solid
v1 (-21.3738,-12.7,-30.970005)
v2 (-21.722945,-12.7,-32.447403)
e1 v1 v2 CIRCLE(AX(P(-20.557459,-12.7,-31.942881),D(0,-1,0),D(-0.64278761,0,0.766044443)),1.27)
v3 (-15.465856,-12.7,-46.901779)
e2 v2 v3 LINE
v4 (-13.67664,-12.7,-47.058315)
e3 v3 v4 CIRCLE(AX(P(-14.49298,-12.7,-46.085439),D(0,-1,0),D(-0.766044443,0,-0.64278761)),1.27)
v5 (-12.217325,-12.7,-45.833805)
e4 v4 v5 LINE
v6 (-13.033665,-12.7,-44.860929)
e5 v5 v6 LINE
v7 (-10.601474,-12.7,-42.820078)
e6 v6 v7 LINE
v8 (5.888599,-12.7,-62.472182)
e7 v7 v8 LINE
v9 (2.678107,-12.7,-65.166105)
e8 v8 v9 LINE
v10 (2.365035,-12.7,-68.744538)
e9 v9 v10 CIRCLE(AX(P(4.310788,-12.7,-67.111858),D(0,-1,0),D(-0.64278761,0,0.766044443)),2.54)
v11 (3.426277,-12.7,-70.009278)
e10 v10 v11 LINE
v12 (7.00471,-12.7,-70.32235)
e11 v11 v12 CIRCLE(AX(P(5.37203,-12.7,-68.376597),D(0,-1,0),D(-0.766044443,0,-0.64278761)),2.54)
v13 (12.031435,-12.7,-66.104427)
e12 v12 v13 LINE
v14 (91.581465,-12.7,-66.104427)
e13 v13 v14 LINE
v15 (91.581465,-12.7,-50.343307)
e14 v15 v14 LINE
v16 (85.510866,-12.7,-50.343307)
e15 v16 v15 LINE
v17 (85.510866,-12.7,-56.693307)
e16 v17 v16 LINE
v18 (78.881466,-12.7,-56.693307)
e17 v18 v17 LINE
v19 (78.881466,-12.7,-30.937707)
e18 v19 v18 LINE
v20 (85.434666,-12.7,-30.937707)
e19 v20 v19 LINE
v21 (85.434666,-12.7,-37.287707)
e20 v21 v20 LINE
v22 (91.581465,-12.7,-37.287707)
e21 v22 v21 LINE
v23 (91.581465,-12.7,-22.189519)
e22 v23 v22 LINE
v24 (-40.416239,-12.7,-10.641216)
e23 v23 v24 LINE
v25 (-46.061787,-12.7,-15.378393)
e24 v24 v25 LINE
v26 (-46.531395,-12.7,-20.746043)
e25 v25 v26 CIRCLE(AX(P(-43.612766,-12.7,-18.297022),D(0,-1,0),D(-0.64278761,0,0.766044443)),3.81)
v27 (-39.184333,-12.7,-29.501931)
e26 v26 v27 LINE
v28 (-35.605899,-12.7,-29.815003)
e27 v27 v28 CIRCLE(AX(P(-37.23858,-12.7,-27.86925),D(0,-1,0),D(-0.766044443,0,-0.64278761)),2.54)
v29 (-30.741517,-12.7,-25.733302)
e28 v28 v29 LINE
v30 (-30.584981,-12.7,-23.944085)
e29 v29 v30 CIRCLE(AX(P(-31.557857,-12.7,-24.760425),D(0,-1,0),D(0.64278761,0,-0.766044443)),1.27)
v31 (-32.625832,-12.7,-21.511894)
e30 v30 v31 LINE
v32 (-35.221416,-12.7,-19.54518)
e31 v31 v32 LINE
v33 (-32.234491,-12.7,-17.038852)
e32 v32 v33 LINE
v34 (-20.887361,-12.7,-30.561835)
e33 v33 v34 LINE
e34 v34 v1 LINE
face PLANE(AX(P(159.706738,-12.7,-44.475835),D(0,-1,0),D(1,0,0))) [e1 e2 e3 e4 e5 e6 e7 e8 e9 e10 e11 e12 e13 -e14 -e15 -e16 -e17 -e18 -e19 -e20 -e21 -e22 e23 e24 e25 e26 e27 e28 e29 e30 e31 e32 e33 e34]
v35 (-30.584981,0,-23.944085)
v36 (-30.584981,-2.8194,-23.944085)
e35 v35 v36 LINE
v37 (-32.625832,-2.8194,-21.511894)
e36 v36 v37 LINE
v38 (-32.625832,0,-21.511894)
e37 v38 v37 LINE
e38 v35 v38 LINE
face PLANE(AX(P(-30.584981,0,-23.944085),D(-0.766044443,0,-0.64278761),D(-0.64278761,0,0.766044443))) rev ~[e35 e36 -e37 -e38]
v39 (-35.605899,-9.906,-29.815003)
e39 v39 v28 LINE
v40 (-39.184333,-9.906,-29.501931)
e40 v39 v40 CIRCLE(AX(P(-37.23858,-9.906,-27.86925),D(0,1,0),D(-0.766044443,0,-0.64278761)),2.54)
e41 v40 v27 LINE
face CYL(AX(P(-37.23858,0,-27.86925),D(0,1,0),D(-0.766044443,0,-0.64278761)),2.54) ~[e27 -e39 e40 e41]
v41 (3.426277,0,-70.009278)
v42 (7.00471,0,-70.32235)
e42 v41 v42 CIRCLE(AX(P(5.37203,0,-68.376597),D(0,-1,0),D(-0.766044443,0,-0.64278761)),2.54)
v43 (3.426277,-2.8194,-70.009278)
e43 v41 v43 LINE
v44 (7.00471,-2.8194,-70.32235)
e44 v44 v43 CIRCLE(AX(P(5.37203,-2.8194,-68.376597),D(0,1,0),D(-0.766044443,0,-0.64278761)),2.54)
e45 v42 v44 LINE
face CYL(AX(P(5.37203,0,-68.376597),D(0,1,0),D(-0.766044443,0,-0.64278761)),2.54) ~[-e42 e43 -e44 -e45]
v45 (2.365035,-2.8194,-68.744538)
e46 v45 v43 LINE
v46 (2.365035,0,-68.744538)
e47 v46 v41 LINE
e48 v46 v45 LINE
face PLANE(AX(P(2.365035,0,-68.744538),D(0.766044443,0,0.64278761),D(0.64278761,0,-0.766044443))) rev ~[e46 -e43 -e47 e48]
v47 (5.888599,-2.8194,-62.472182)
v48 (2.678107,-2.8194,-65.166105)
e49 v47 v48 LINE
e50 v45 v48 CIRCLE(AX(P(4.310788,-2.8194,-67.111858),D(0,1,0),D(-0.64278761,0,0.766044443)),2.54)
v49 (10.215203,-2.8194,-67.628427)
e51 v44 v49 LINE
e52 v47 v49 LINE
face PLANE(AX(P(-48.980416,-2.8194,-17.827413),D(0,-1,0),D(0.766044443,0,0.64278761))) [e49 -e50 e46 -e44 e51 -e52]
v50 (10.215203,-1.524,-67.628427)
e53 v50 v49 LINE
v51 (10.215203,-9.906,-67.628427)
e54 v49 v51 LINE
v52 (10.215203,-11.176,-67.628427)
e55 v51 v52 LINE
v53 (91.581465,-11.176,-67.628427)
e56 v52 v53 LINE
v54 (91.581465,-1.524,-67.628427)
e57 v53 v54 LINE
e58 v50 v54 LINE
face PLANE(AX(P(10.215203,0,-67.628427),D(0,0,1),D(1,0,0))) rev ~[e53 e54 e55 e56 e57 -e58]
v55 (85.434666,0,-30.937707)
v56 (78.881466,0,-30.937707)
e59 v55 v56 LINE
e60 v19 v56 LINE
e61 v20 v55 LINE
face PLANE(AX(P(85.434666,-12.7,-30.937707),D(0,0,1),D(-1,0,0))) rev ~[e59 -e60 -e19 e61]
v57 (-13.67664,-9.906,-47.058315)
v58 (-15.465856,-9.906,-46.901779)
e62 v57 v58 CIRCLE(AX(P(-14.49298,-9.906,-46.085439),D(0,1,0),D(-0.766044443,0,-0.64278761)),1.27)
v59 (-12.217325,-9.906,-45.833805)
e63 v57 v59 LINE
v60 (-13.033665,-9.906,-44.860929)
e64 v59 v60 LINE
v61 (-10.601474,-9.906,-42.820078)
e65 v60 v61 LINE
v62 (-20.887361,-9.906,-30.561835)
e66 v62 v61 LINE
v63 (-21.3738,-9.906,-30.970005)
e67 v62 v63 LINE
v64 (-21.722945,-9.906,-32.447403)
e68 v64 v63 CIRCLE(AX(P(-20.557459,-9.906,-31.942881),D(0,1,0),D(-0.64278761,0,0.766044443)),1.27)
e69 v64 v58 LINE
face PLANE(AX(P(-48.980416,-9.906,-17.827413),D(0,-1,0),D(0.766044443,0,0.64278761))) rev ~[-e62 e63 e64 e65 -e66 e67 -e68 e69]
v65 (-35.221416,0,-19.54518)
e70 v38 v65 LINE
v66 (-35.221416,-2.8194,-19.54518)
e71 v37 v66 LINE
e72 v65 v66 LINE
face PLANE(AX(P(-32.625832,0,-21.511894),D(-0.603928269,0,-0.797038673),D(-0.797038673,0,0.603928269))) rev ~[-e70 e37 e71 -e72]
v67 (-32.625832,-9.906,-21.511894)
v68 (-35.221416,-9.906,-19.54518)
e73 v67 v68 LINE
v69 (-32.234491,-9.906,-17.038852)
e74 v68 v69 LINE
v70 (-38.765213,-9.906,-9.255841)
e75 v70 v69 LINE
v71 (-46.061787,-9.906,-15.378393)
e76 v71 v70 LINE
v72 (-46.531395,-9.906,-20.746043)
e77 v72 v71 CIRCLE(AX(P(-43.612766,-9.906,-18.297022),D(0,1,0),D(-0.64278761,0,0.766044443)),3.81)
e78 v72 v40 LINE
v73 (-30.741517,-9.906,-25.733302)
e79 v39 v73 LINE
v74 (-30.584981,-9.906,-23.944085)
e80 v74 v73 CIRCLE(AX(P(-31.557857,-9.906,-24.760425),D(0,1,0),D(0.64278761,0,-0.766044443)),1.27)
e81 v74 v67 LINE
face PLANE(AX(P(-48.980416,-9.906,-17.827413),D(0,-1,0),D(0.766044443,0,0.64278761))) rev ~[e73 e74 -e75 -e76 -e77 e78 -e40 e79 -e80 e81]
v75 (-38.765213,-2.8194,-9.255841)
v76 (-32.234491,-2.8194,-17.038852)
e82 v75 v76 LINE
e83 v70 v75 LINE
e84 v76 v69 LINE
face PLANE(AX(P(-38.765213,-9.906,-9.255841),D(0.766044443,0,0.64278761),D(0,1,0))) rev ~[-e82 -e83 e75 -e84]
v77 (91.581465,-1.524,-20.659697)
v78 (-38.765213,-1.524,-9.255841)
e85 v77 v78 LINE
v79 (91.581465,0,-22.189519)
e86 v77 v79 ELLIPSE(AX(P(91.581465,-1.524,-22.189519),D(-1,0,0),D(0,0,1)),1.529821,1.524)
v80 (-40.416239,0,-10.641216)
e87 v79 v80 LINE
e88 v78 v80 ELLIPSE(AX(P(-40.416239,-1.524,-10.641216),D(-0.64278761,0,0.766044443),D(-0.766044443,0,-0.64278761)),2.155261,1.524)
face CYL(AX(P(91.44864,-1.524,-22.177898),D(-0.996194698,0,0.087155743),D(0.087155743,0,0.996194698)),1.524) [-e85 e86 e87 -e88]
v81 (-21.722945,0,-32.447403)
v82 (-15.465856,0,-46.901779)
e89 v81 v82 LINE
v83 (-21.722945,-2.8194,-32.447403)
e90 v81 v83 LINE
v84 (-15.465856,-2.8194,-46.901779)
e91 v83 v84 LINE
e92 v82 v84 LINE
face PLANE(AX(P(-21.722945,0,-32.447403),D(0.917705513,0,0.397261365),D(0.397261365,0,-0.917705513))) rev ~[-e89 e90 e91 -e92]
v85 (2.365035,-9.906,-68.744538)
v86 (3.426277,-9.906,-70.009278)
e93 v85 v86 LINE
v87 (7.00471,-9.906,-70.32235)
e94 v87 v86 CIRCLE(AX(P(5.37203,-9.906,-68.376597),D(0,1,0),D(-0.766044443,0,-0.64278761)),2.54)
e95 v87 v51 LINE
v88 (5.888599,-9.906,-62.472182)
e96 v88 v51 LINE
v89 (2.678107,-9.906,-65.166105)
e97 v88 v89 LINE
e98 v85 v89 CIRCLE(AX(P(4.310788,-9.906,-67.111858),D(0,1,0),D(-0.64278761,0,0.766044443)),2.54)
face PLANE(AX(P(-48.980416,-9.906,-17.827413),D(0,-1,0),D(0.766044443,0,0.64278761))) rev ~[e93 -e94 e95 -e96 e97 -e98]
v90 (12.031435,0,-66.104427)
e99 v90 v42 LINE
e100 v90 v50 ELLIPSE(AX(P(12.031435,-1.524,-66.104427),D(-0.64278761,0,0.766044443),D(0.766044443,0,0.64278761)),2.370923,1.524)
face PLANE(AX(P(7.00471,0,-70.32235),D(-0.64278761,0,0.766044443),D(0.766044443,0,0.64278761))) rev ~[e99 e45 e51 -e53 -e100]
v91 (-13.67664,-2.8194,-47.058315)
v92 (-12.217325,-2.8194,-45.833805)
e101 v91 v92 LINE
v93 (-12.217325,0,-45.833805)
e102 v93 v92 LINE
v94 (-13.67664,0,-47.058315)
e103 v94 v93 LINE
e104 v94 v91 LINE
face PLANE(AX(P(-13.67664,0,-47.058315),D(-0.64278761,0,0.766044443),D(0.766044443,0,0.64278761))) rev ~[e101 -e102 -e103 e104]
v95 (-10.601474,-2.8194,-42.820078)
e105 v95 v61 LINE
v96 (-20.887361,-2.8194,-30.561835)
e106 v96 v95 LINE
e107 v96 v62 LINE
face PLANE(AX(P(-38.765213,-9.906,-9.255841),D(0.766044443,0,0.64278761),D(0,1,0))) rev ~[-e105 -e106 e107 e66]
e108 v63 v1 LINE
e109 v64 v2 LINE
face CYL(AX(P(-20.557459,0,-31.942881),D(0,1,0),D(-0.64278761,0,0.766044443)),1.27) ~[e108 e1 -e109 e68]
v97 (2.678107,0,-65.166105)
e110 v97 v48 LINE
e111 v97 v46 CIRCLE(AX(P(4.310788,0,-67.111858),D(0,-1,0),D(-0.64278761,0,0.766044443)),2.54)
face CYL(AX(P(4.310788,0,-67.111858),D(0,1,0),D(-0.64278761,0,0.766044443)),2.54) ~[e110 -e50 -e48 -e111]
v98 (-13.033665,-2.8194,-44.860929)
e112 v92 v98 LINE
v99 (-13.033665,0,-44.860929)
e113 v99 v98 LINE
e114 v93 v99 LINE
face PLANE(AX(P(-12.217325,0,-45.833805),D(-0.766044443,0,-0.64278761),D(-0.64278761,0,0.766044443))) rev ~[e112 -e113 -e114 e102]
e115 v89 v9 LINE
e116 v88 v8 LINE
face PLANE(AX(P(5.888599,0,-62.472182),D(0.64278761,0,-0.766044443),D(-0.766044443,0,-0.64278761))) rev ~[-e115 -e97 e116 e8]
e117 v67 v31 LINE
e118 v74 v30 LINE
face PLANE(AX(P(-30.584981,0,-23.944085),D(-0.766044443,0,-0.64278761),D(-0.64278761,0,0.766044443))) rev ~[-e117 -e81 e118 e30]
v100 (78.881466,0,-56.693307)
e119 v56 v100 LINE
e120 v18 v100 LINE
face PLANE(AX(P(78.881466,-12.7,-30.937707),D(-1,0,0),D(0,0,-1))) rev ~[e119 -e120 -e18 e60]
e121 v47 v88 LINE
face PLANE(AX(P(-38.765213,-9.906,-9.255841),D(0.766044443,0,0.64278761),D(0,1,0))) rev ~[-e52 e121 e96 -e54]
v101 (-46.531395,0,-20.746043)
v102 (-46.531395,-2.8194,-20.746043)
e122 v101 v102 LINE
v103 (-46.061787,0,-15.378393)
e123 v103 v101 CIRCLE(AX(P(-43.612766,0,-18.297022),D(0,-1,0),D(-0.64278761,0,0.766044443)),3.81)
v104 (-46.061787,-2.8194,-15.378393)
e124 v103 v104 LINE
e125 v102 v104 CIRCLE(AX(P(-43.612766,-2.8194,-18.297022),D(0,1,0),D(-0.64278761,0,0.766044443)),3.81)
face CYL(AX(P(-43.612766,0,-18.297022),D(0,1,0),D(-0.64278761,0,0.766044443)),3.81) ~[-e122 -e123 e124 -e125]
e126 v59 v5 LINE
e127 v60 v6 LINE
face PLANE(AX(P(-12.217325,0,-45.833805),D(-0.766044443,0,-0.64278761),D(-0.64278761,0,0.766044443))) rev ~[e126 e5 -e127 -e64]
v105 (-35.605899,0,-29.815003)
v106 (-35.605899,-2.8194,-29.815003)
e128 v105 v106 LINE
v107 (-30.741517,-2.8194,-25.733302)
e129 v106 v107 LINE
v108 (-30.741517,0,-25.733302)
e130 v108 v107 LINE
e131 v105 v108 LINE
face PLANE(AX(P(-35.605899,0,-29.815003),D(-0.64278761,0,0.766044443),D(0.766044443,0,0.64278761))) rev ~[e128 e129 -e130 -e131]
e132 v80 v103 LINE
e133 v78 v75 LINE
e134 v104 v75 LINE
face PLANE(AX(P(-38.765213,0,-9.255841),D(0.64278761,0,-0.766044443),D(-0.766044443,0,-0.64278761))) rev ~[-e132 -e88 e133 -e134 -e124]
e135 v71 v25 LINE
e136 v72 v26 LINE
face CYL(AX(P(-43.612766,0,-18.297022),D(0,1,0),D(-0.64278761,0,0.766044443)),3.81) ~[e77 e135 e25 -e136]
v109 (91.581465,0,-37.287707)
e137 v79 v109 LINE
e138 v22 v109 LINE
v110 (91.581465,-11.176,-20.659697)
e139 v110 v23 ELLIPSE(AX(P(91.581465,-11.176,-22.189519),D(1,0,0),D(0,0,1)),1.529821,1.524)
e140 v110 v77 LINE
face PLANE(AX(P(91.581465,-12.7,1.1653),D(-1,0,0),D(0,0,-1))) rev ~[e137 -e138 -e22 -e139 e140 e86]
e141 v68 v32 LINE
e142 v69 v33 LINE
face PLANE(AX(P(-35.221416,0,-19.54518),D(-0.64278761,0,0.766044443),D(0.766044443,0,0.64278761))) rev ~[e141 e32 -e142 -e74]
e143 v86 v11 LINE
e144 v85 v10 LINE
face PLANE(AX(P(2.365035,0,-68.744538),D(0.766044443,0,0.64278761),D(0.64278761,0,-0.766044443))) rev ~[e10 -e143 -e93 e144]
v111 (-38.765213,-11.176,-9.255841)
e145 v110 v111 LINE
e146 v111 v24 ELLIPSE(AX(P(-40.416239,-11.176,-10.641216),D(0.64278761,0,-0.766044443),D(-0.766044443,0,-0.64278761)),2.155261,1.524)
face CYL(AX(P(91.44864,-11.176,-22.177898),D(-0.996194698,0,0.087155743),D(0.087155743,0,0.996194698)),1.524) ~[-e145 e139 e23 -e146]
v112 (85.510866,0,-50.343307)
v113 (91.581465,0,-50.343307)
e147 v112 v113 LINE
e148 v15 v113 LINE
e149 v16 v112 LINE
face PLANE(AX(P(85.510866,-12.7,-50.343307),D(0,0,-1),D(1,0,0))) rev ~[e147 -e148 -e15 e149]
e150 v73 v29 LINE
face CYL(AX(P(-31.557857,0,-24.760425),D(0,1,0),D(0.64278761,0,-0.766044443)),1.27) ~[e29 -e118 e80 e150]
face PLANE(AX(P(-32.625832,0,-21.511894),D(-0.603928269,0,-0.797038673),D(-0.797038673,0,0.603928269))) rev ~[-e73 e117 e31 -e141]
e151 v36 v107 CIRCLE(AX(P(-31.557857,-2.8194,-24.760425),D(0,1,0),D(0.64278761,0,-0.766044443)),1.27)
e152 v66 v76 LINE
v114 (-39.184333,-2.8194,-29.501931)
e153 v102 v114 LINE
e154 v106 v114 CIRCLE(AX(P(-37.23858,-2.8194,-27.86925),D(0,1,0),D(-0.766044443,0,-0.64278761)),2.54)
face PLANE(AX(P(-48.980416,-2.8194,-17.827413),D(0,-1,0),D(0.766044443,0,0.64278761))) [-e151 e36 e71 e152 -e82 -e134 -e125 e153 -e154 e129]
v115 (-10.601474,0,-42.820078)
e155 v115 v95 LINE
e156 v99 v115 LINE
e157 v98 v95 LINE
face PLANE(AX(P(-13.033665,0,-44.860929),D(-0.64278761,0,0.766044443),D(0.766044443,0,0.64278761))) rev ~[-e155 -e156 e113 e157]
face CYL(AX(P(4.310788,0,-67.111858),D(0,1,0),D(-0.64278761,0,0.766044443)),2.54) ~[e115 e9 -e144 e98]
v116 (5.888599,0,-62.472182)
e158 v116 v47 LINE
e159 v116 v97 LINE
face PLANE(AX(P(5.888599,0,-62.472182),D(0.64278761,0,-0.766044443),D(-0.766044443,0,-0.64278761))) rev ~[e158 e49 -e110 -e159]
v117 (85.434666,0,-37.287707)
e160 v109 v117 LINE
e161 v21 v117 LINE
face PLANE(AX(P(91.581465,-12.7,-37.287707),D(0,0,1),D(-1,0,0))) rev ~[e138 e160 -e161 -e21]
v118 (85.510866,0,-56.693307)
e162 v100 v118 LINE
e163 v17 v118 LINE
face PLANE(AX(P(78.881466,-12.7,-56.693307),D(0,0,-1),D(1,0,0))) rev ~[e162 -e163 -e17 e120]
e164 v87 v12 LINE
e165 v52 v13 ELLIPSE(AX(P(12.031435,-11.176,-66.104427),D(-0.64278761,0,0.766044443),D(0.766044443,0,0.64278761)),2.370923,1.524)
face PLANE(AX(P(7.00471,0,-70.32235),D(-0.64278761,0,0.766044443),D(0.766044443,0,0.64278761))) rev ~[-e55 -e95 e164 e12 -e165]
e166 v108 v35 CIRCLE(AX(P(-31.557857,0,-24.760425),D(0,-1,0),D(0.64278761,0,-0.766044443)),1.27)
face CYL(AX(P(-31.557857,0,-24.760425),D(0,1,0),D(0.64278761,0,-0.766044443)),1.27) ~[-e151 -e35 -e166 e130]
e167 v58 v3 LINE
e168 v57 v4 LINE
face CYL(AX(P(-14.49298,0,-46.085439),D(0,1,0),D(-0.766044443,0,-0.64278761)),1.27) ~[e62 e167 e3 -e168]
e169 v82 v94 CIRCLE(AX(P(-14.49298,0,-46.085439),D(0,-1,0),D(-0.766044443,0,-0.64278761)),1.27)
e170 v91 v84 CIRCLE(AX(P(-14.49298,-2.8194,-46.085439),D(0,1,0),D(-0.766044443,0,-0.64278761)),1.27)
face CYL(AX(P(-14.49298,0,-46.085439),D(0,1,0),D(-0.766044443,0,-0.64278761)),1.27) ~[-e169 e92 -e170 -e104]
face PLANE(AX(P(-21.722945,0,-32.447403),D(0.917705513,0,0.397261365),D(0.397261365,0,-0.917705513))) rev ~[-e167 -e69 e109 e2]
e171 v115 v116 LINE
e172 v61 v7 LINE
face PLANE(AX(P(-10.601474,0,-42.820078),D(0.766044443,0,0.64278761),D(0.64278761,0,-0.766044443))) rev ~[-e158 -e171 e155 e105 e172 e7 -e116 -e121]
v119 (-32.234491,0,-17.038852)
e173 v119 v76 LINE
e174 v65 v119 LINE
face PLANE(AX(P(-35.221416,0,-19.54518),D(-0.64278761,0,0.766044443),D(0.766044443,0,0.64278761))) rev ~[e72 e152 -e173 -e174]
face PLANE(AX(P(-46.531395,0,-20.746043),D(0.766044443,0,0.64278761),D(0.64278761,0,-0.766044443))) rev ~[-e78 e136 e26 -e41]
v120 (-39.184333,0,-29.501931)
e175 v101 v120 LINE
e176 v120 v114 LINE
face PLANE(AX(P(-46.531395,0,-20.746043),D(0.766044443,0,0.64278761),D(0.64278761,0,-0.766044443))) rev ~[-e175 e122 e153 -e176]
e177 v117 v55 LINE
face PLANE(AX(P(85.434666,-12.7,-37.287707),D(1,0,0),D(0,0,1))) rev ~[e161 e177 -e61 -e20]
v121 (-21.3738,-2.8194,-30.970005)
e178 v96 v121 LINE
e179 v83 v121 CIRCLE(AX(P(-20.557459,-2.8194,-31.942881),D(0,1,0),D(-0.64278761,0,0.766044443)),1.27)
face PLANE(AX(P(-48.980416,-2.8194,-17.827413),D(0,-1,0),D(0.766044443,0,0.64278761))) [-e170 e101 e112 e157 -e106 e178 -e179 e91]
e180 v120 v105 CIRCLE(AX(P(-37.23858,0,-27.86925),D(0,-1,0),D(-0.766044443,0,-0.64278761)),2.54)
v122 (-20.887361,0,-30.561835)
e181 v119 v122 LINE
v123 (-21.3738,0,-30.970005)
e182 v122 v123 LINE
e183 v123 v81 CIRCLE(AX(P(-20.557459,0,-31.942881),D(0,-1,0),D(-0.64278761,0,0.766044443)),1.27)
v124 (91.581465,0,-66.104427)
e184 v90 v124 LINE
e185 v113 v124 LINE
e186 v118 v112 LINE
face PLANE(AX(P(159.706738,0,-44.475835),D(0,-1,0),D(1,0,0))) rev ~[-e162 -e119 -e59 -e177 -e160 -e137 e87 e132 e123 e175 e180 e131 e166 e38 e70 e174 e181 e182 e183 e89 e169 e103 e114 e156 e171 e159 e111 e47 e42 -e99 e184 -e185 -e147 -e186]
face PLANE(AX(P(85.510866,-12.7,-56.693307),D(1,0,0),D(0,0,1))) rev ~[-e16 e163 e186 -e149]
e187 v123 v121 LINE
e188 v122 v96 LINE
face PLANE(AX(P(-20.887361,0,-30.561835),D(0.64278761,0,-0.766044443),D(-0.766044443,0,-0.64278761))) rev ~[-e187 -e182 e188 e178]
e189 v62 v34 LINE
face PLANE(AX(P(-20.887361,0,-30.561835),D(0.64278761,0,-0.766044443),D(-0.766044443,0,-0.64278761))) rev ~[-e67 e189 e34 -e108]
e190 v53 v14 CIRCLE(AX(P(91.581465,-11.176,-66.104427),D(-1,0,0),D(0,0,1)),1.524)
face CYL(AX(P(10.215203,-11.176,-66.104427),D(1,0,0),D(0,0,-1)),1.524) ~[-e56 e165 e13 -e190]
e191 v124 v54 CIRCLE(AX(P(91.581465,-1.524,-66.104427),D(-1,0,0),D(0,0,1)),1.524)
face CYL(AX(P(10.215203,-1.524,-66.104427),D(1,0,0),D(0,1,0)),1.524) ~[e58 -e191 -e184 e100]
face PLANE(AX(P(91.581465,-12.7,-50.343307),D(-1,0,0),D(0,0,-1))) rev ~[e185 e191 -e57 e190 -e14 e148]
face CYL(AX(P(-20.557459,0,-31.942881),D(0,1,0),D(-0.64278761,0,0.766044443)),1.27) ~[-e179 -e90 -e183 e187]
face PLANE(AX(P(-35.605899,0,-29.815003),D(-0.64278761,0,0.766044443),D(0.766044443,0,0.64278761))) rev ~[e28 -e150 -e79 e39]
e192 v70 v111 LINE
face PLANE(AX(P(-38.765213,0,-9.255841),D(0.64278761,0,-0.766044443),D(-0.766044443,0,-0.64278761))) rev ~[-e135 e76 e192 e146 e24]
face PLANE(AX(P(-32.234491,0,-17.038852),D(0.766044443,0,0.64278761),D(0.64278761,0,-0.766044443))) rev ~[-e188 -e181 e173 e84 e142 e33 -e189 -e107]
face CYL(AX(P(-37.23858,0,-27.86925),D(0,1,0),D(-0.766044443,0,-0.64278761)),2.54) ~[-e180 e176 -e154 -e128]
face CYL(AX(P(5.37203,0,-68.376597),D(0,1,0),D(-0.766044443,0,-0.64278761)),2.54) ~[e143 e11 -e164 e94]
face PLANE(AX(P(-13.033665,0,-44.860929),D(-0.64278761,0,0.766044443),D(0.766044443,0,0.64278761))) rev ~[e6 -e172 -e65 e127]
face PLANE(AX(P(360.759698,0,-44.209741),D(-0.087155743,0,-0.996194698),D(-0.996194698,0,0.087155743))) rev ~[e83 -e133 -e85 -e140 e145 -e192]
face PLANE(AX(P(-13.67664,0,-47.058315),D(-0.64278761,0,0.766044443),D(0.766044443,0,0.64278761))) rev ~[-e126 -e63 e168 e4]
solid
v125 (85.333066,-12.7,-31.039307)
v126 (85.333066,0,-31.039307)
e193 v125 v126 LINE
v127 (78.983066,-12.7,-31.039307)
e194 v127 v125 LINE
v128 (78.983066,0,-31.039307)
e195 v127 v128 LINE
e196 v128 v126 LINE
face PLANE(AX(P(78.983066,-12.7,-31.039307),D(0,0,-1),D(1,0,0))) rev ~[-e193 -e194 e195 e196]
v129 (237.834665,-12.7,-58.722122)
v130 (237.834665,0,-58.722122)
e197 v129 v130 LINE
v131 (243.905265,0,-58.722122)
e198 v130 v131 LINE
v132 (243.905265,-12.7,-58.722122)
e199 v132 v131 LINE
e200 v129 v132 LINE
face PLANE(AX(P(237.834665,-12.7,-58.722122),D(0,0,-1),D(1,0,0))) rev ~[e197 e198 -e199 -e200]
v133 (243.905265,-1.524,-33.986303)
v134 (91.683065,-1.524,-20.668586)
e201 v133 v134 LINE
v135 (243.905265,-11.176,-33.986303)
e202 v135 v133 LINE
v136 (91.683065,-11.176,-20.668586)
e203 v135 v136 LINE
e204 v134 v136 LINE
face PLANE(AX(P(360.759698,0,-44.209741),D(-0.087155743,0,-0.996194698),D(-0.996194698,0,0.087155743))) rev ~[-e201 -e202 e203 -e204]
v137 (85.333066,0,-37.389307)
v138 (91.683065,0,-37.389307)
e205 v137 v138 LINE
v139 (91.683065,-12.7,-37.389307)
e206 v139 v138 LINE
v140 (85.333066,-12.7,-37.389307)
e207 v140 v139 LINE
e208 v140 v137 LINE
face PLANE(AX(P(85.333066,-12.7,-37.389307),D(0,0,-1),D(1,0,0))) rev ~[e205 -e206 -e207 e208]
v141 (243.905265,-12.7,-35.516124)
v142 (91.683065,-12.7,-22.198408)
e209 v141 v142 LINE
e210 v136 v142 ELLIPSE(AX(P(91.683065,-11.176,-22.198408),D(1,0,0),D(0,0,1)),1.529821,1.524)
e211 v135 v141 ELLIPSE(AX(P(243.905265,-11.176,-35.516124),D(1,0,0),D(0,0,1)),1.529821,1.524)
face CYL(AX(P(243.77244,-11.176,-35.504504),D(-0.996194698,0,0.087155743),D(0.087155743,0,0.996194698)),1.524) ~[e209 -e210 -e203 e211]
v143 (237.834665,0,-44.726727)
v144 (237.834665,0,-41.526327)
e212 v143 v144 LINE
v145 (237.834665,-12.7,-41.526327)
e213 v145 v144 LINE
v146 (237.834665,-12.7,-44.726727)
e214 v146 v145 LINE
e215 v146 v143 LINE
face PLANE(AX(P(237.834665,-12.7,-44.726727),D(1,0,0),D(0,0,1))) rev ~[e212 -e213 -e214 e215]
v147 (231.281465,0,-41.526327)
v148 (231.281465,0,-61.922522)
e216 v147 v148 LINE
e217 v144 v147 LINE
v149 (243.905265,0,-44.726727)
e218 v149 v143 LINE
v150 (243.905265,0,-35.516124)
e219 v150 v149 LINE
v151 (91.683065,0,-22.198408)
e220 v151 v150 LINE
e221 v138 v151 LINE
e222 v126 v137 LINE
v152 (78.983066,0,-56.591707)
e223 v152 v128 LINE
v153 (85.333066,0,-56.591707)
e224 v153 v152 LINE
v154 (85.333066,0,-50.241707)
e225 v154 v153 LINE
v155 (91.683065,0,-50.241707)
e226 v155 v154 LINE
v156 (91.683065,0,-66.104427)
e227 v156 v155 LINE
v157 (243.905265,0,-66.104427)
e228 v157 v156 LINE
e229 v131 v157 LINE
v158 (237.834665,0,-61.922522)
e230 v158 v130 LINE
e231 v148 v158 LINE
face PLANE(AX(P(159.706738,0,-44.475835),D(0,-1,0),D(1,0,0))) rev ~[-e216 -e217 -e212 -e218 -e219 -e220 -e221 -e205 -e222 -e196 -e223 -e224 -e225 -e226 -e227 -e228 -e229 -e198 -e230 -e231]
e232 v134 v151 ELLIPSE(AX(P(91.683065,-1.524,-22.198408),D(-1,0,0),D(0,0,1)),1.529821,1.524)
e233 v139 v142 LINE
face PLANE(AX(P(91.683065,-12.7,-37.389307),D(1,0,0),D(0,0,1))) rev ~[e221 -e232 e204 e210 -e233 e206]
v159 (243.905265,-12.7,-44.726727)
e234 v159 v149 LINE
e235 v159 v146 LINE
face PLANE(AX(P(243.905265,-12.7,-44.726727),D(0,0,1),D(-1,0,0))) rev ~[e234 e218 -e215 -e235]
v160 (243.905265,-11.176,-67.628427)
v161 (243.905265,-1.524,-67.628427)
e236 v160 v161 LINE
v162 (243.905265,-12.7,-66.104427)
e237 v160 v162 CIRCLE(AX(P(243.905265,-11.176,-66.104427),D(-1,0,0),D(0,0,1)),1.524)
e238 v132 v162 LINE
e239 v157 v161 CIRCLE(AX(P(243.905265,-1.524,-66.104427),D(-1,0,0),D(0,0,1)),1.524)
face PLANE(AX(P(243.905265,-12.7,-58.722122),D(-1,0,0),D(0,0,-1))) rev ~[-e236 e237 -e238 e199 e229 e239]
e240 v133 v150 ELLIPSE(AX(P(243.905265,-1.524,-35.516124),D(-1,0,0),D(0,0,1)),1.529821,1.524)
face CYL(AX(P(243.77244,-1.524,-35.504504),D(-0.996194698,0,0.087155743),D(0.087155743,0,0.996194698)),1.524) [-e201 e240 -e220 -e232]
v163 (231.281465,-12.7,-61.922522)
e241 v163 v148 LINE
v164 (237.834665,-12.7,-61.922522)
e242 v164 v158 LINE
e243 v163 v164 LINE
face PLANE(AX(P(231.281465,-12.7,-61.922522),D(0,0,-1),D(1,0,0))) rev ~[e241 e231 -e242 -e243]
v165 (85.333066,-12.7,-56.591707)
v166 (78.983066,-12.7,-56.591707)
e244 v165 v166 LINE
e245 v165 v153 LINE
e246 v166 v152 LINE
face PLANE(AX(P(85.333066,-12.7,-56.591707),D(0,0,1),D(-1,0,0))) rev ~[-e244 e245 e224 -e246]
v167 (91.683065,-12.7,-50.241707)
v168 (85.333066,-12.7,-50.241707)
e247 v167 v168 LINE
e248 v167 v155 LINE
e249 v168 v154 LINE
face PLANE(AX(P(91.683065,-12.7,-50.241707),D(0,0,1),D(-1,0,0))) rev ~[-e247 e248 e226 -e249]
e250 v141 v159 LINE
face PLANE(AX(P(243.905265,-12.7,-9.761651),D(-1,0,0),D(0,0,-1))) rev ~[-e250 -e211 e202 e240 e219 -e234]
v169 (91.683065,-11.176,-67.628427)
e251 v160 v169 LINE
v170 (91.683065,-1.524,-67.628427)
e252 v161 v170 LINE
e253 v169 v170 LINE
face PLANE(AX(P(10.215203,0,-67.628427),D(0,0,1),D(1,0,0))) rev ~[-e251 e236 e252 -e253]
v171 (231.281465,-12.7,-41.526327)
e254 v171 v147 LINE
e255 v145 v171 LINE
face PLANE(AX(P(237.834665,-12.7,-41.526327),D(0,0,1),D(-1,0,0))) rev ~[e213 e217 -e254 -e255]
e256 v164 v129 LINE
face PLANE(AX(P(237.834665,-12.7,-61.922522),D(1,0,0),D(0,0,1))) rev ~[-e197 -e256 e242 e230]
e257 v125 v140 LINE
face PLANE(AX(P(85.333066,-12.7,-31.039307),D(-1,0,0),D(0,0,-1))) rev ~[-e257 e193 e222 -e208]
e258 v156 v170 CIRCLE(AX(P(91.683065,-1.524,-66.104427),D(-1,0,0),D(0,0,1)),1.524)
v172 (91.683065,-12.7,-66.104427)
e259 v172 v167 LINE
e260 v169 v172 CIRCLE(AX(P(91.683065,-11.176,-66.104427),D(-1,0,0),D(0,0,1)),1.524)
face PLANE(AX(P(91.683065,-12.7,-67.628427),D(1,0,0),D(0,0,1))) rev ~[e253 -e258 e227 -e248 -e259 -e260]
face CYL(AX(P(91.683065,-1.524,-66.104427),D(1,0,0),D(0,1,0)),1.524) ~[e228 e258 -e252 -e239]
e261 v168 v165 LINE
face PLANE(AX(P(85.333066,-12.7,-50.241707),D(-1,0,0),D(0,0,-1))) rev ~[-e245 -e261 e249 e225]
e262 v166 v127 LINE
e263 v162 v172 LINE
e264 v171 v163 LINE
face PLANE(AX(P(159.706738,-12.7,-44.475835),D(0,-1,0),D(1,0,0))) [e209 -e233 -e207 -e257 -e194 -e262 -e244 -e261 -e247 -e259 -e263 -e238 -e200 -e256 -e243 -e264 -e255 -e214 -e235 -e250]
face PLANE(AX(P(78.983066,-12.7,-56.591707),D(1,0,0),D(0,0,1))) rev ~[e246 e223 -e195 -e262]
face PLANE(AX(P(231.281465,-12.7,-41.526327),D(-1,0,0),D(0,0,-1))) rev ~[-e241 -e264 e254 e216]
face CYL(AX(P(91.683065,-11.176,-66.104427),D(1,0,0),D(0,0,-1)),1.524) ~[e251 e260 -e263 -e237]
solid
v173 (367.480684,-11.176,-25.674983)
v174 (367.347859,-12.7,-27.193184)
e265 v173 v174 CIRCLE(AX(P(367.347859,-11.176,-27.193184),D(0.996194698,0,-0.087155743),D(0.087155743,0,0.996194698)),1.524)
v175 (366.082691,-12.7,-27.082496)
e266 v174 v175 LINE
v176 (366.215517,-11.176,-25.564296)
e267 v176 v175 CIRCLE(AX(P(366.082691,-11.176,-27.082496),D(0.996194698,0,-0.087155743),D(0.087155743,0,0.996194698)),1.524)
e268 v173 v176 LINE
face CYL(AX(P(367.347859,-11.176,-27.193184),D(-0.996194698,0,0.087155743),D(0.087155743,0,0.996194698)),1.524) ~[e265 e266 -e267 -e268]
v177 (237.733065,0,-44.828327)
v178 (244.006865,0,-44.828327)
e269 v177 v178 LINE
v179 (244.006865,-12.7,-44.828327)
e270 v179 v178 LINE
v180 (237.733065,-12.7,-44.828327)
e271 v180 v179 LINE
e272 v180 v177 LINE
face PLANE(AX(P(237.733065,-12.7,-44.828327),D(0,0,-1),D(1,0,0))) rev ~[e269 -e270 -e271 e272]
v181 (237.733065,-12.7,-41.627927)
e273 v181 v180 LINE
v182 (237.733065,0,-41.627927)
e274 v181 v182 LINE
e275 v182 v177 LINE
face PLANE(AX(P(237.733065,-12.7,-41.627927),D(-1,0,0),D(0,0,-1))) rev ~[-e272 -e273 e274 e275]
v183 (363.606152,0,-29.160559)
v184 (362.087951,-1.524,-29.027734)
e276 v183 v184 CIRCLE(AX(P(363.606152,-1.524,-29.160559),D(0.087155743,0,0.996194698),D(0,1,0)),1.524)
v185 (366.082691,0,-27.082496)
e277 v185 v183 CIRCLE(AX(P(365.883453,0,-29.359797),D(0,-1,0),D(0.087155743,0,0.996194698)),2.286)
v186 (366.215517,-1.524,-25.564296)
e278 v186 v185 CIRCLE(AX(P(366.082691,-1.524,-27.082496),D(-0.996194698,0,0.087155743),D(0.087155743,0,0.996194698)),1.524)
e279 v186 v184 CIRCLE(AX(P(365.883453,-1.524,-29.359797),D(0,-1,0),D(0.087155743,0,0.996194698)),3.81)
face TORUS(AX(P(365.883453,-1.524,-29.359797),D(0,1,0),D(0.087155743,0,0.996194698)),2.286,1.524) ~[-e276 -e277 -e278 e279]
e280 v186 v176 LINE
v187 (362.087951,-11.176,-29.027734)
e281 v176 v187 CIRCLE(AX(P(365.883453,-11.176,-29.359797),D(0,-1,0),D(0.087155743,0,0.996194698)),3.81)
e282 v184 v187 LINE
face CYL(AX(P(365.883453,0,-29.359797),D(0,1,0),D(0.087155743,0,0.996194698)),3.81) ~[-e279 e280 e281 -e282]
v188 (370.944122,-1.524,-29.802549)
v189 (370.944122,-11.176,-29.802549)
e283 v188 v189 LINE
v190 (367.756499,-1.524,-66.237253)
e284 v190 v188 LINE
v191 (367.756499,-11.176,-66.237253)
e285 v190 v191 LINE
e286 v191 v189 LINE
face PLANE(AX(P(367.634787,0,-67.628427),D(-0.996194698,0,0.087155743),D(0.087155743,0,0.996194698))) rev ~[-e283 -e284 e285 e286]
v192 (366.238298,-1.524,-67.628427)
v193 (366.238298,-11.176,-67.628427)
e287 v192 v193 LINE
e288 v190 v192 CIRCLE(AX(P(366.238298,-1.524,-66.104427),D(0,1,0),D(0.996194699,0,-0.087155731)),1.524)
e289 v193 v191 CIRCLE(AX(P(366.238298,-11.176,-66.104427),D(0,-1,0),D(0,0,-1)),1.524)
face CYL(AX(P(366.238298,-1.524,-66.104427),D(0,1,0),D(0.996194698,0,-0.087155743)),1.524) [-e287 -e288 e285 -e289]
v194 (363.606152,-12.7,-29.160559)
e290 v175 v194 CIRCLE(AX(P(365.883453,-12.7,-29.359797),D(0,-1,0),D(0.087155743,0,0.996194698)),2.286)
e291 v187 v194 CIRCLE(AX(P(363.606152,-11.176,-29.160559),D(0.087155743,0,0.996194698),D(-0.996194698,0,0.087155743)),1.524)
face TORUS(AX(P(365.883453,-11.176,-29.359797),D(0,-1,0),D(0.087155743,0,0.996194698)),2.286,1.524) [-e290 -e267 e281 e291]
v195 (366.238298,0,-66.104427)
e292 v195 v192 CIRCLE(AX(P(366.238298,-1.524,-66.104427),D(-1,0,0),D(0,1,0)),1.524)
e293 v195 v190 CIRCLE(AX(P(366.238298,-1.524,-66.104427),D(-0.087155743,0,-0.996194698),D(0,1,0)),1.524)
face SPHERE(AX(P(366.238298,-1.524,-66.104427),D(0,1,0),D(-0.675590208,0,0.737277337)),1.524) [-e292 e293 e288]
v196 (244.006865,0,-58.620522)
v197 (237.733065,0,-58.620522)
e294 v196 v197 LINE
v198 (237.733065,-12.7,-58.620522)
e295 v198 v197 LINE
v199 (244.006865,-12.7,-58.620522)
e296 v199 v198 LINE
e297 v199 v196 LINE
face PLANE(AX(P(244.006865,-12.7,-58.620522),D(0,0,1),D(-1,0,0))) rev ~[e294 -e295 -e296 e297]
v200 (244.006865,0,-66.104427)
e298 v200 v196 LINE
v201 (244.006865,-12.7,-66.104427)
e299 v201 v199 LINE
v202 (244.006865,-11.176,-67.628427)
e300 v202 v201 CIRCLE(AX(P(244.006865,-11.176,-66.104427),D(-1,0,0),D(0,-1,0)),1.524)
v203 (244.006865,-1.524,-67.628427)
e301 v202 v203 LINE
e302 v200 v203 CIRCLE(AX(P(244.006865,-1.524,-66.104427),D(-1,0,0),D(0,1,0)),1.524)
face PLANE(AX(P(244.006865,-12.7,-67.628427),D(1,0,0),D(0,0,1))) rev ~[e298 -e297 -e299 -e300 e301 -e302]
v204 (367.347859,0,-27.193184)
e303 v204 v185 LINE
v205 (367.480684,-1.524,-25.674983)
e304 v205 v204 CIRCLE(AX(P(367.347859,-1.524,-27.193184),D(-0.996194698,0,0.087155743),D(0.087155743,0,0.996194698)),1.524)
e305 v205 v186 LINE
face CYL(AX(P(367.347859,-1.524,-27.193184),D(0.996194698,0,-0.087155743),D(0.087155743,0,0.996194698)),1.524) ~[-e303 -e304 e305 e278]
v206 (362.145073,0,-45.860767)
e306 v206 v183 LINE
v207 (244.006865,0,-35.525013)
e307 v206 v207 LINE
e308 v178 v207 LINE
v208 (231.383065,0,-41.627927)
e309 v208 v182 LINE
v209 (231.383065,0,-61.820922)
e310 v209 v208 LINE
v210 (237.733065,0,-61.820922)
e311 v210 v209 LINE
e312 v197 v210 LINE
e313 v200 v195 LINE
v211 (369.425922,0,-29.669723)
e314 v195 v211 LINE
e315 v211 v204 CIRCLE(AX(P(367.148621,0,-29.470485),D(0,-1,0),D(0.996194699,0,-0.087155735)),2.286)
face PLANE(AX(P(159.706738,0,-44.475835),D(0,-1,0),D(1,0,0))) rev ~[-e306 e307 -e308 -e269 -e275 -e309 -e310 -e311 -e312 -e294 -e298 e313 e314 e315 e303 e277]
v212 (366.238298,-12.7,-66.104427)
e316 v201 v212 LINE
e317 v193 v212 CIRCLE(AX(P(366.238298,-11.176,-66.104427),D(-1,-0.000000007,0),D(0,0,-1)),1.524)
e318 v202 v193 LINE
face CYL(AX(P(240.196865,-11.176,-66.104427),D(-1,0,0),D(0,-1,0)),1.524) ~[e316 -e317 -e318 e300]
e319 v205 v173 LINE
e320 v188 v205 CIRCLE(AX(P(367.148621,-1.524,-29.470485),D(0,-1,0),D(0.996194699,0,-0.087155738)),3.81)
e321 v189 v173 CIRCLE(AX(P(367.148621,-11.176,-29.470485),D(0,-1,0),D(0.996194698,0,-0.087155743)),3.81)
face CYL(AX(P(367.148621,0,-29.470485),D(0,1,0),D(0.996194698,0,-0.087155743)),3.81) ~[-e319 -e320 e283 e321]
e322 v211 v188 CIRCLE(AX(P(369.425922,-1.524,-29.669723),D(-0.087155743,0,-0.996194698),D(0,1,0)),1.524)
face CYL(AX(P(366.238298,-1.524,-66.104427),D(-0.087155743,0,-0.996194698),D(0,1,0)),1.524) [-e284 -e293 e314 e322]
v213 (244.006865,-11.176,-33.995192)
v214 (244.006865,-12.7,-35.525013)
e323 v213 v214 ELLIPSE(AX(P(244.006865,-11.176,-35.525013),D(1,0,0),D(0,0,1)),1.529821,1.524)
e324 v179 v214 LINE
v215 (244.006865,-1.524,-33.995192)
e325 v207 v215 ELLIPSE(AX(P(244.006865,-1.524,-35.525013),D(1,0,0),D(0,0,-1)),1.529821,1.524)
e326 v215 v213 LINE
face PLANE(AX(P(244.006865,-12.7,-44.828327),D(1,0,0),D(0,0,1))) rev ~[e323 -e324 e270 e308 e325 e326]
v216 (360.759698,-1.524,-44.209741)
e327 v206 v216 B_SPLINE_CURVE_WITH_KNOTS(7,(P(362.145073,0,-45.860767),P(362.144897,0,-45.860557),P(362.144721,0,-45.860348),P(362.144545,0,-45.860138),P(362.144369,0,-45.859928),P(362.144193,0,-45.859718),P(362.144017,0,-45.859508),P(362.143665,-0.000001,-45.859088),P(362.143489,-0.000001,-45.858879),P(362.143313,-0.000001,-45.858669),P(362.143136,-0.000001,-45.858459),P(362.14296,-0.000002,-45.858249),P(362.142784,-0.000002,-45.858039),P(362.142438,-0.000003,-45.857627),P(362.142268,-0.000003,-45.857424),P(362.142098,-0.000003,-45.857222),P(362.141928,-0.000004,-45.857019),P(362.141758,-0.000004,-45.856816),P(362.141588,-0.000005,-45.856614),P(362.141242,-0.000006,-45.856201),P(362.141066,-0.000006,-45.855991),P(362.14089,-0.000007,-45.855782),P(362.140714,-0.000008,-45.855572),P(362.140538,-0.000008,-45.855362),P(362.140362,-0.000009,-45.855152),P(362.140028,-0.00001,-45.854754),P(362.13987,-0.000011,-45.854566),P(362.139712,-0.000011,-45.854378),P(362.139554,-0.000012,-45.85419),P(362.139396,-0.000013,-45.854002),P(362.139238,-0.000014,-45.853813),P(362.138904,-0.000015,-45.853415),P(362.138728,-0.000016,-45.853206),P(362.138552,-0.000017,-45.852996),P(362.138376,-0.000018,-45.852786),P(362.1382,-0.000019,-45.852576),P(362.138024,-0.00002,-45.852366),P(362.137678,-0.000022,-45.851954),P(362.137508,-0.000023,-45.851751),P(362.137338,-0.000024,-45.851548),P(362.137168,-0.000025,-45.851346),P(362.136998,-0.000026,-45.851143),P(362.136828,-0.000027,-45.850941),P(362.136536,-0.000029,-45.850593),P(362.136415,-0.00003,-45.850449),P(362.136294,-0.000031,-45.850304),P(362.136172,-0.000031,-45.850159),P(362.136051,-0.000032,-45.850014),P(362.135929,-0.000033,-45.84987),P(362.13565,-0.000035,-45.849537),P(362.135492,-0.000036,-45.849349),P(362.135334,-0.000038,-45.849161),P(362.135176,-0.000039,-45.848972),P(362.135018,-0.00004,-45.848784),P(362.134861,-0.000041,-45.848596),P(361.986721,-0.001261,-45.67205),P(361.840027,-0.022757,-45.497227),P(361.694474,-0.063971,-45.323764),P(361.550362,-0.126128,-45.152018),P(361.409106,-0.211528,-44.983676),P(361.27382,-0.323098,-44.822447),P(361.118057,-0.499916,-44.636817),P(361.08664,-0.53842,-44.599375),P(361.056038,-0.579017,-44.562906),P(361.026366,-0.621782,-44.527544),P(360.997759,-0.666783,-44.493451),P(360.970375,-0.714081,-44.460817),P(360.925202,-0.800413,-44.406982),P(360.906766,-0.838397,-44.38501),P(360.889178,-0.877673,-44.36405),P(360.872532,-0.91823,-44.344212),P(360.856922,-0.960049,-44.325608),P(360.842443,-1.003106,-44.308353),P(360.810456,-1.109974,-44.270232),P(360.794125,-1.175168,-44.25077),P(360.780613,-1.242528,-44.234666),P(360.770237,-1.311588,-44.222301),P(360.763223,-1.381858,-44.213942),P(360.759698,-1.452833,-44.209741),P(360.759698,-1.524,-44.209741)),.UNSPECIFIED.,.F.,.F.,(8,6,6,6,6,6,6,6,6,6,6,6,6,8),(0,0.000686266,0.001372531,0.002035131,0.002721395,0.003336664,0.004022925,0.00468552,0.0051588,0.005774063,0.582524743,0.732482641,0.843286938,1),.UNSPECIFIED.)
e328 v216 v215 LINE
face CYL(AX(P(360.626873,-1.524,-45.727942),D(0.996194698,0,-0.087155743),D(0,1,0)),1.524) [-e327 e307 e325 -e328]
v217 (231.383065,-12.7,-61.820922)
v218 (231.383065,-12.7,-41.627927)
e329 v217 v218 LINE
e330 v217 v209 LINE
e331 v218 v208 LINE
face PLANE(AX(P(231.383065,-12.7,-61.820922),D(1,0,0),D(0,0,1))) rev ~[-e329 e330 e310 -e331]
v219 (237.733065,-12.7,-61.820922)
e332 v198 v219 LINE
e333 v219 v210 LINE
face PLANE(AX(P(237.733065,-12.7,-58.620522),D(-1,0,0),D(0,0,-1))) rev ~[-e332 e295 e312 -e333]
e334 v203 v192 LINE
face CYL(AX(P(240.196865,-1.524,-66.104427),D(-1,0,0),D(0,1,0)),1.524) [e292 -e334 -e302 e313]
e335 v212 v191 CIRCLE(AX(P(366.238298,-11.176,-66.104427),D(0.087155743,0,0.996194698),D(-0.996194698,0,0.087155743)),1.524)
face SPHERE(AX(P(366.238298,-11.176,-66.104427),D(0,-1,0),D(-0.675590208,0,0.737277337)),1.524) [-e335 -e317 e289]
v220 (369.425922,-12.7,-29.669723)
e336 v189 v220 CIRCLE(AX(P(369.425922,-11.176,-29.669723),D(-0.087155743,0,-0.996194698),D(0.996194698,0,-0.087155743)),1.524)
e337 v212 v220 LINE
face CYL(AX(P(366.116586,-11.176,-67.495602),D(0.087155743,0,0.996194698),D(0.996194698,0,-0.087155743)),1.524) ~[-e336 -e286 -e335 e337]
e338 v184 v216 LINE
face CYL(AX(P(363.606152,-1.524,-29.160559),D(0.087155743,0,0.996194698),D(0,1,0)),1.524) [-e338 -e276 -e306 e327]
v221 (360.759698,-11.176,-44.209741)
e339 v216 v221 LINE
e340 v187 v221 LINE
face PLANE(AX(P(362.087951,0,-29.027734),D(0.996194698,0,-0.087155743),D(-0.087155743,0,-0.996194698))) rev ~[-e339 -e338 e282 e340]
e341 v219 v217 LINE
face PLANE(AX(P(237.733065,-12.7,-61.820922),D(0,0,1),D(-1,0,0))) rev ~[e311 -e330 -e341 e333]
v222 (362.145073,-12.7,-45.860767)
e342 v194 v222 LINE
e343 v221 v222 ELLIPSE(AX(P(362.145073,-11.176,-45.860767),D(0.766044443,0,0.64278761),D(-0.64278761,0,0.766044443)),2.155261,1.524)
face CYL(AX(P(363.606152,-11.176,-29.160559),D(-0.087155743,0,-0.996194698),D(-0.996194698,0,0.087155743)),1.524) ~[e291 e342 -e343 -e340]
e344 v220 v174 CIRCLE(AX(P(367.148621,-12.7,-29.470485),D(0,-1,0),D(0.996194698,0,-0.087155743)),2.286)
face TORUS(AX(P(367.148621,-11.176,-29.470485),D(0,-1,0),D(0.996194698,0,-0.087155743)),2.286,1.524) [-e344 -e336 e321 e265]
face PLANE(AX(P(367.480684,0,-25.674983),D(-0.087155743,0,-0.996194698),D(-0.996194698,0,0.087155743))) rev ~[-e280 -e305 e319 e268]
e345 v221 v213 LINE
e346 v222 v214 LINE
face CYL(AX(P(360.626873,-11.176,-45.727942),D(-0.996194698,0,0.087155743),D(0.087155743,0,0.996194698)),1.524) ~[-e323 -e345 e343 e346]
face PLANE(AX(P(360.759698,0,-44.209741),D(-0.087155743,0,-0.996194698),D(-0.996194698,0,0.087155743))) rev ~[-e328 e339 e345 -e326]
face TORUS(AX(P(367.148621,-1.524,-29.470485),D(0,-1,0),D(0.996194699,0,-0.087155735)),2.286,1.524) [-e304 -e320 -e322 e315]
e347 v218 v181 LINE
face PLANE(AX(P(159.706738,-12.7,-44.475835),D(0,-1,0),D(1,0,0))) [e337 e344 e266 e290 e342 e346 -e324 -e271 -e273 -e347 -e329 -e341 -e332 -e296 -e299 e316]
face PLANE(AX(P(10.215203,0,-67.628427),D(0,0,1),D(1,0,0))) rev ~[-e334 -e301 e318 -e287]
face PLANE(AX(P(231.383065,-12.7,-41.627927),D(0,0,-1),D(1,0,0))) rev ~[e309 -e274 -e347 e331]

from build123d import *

# Parameters (mm, degrees)
F1_DEPTH         = 12.7
F2_W             = 13.335
F2_H             = 7.0866
F3_DEPTH         = 93.472
F5_DEPTH         = 25.4
F7_R             = 1.524
F10_F1_R         = 1.524
F10_F2_R         = 1.524
F10_S1_F1_R      = 1.524
F10_S1_F2_R      = 1.524
F10_S2_T1_DEPTH  = 126.041432676
F10_S2_T3_DEPTH  = 1.27
F10_S2_T5_DEPTH  = 36.5738786888
F10_S2_T7_DEPTH  = 121.0088094258
F10_S2_T9_DEPTH  = 15.24
F10_S2_T11_DEPTH = 9.652
F10_S2_T16_DEPTH = 1.524
F10_S2_T22_DEPTH = 1.524
F10_S2_T26_ANGLE = 90
F10_S2_T28_ANGLE = 90
F10_S2_T33_DEPTH = 124.8188094258
F10_S2_T37_DEPTH = 19.05


# Not quite as in the source:
# - a fillet or chamfer that OpenCascade refuses, or shapes differently, is made with other operations: its cross-section is extruded or revolved along the edge and cut away or added
# - a feature of the source that left no trace in its solid (it failed there, or was rolled back) is left out


with BuildPart() as f1:
    # F0 (on Front) → F1 (new body)
    with BuildSketch(Plane.XZ):
        with BuildLine():
            ThreePointArc((-46.0617865298, -15.3783926414), (-47.4082675367, -17.9649585898), (-46.5313950652, -20.7460427626))
            Line((-46.5313950652, -20.7460427626), (-39.1843326865, -29.5019307475))
            ThreePointArc((-39.1843326865, -29.5019307475), (-37.4599553875, -30.399584752), (-35.6058992724, -29.8150031044))
            Line((-35.6058992724, -29.8150031044), (-30.7415170586, -25.7333017829))
            ThreePointArc((-30.7415170586, -25.7333017829), (-30.2926900563, -24.8711131334), (-30.5849808801, -23.9440850758))
            Line((-30.5849808801, -23.9440850758), (-32.6258315409, -21.5118939689))
            Line((-32.6258315409, -21.5118939689), (-35.2214163384, -19.5451800716))
            Line((-35.2214163384, -19.5451800716), (-32.2344910947, -17.0388522013))
            Line((-32.2344910947, -17.0388522013), (-20.8873614209, -30.5618347556))
            Line((-20.8873614209, -30.5618347556), (-21.3737996423, -30.9700048878))
            ThreePointArc((-21.3737996423, -30.9700048878), (-21.7934146066, -31.6507945747), (-21.722945379, -32.4474032641))
            Line((-21.722945379, -32.4474032641), (-15.4658563045, -46.9017792559))
            ThreePointArc((-15.4658563045, -46.9017792559), (-14.603667655, -47.3506062582), (-13.6766395974, -47.0583154344))
            Line((-13.6766395974, -47.0583154344), (-12.2173249333, -45.8338050379))
            Line((-12.2173249333, -45.8338050379), (-13.0336651976, -44.8609285952))
            Line((-13.0336651976, -44.8609285952), (-10.6014740907, -42.8200779344))
            Line((-10.6014740907, -42.8200779344), (5.8885992482, -62.4721820782))
            Line((5.8885992482, -62.4721820782), (2.6781069871, -65.1661049504))
            ThreePointArc((2.6781069871, -65.1661049504), (1.7804529825, -66.8904822493), (2.3650346302, -68.7445383645))
            Line((2.3650346302, -68.7445383645), (3.4262769738, -70.0092777401))
            ThreePointArc((3.4262769738, -70.0092777401), (5.1506542727, -70.9069317447), (7.0047103879, -70.322350097))
            Line((7.0047103879, -70.322350097), (10.215202649, -67.6284272248))
            Line((10.215202649, -67.6284272248), (367.6347867909, -67.6284272248))
            Line((367.6347867909, -67.6284272248), (370.9441223638, -29.8025485384))
            ThreePointArc((370.9441223638, -29.8025485384), (370.0672498924, -27.0214643656), (367.480683944, -25.6749833588))
            Line((367.480683944, -25.6749833588), (366.2155166774, -25.5642955655))
            ThreePointArc((366.2155166774, -25.5642955655), (363.4344325046, -26.4411680369), (362.0879514978, -29.0277339854))
            Line((362.0879514978, -29.0277339854), (360.7596979783, -44.2097411843))
            Line((360.7596979783, -44.2097411843), (-38.7652132091, -9.2558406592))
            Line((-38.7652132091, -9.2558406592), (-46.0617865298, -15.3783926414))
        make_face()
    extrude(amount=F1_DEPTH)

    # F2 (on face) → F3 (cut)
    with BuildSketch(Plane(origin=(-11.4592404683, 0, 13.6565909966), x_dir=(0.7660444431, 0, 0.6427876097), z_dir=(-0.6427876097, 0, 0.7660444431))):
        with Locations((-42.3129158581, -6.3627)):
            Rectangle(F2_W, F2_H)
    extrude(amount=-F3_DEPTH, mode=Mode.SUBTRACT)

    # F4 (on face) → F5 (cut)
    with BuildSketch(Plane.XZ.offset(12.7)):
        Polygon((91.5814654057, -20.6596973662), (91.6830654057, -20.6685862144), (91.6830654057, 1.1655155965), (91.5814654057, 1.1653002073), align=None)
        Polygon((91.5814654057, -67.6284272248), (91.6830654057, -67.6284272248), (91.6830654057, -50.2417070188), (85.3330660997, -50.2417070188), (85.3330660997, -56.5917070188), (78.9830660997, -56.5917070188), (78.9830660997, -31.0393070188), (85.3330660997, -31.0393070188), (85.3330660997, -37.3893070188), (91.6830654057, -37.3893070188), (91.6830654057, -20.6685862144), (91.5814654057, -20.6596973662), (91.5814654057, -37.2877070188), (85.4346660997, -37.2877070188), (85.4346660997, -30.9377070188), (78.8814660997, -30.9377070188), (78.8814660997, -56.6933070188), (85.5108660997, -56.6933070188), (85.5108660997, -50.3433070188), (91.5814654057, -50.3433070188), align=None)
        Polygon((243.9052654057, -33.9863030514), (244.0068654057, -33.9951918996), (244.0068654057, -9.7616507337), (243.9052654057, -9.7616507337), align=None)
        Polygon((243.9052654057, -58.7221217398), (243.9052654057, -67.6284272248), (244.0068654057, -67.6284272248), (244.0068654057, -58.6205217398), (237.7330654057, -58.6205217398), (237.7330654057, -61.8209217398), (231.3830654057, -61.8209217398), (231.3830654057, -41.6279271885), (237.7330654057, -41.6279271885), (237.7330654057, -44.8283271885), (244.0068654057, -44.8283271885), (244.0068654057, -33.9951918996), (243.9052654057, -33.9863030514), (243.9052654057, -44.7267271885), (237.8346654057, -44.7267271885), (237.8346654057, -41.5263271885), (231.2814654057, -41.5263271885), (231.2814654057, -61.9225217398), (237.8346654057, -61.9225217398), (237.8346654057, -58.7221217398), align=None)
    extrude(amount=-F5_DEPTH, mode=Mode.SUBTRACT)

    # F7
    f7_edges = [f1.edges().sort_by_distance(p)[0] for p in [
        (26.408126, -12.7, -14.957769),
        (167.794165, -12.7, -27.327445),
        (302.383282, -12.7, -39.102467),
        (361.423825, -12.7, -36.618738),
        (167.794165, -12.7, -67.628427),
        (50.898334, -12.7, -67.628427),
    ]]
    fillet(f7_edges, radius=F7_R)

    # F10: fillet of radius 1.524 on 2 edges, made by hand

    # F10_f1
    f10_f1_edges = [f1.edges().sort_by_distance(p)[0] for p in [
        (26.4081260983, 0, -14.9577690127),
    ]]
    fillet(f10_f1_edges, radius=F10_F1_R)

    # F10_f2
    f10_f2_edges = [f1.edges().sort_by_distance(p)[0] for p in [
        (50.8983340273, 0, -67.6284272248),
    ]]
    fillet(f10_f2_edges, radius=F10_F2_R)

    # F10#s1: fillet of radius 1.524 on 2 edges, made by hand

    # F10_s1_f1
    f10_s1_f1_edges = [f1.edges().sort_by_distance(p)[0] for p in [
        (167.7941654057, 0, -27.3274446329),
    ]]
    fillet(f10_s1_f1_edges, radius=F10_S1_F1_R)

    # F10_s1_f2
    f10_s1_f2_edges = [f1.edges().sort_by_distance(p)[0] for p in [
        (167.7941654057, 0, -67.6284272248),
    ]]
    fillet(f10_s1_f2_edges, radius=F10_S1_F2_R)

    # F10#s2: fillet of radius 1.524 on 9 edges, made by hand

    # F10_s2_s2 → F10_s2_t1 (cut)
    with BuildSketch(Plane.YZ.offset(240.1968654057)):
        with BuildLine():
            ThreePointArc((-12.7, -66.1044272248), (-12.2536307345, -67.1820579594), (-11.176, -67.6284272248))
            Line((-11.176, -67.6284272248), (-12.7, -67.6284272248))
            Line((-12.7, -67.6284272248), (-12.7, -66.1044272248))
        make_face()
        with BuildLine():
            ThreePointArc((0, -66.1044272248), (-0.4463692655, -67.1820579594), (-1.524, -67.6284272248))
            Line((-1.524, -67.6284272248), (0, -67.6284272248))
            Line((0, -67.6284272248), (0, -66.1044272248))
        make_face()
    extrude(amount=F10_S2_T1_DEPTH, mode=Mode.SUBTRACT)

    # F10_s2_s4 → F10_s2_t3 (cut)
    with BuildSketch(Plane(origin=(366.9184623231, 0, -32.1012058916), x_dir=(0, 1, 0), z_dir=(-0.9961946981, 0, 0.0871557427))):
        with BuildLine():
            ThreePointArc((-1.524, -6.4507696589), (-0.4463692655, -6.0044003935), (0, -4.9267696589))
            Line((0, -4.9267696589), (0, -6.4507696589))
            Line((0, -6.4507696589), (-1.524, -6.4507696589))
        make_face()
    extrude(amount=F10_S2_T3_DEPTH, mode=Mode.SUBTRACT)

    # F10_s2_s6 → F10_s2_t5 (cut)
    with BuildSketch(Plane(origin=(-2.9574653212, 0, -33.8039833053), x_dir=(0, 1, 0), z_dir=(0.0871557427, 0, 0.9961946981))):
        with BuildLine():
            ThreePointArc((0, -370.6060312408), (-0.4463692655, -371.6836619753), (-1.524, -372.1300312408))
            Line((-1.524, -372.1300312408), (0, -372.1300312408))
            Line((0, -372.1300312408), (0, -370.6060312408))
        make_face()
    extrude(amount=F10_S2_T5_DEPTH, mode=Mode.SUBTRACT)

    # F10_s2_s8 → F10_s2_t7 (cut)
    with BuildSketch(Plane(origin=(361.8577932568, 0, -31.6584547185), x_dir=(0, 1, 0), z_dir=(-0.9961946981, 0, 0.0871557427))):
        with BuildLine():
            ThreePointArc((0, 14.1232303411), (-0.4463692655, 13.0455996065), (-1.524, 12.5992303411))
            Line((-1.524, 12.5992303411), (0, 12.5992303411))
            Line((0, 12.5992303411), (0, 14.1232303411))
        make_face()
    extrude(amount=F10_S2_T7_DEPTH, mode=Mode.SUBTRACT)

    # F10_s2_s10 → F10_s2_t9 (cut)
    with BuildSketch(Plane(origin=(0.2301582411, 0, 2.6307207331), x_dir=(0, 1, 0), z_dir=(-0.0871557427, 0, -0.9961946981))):
        with BuildLine():
            ThreePointArc((0, 364.7640312408), (-0.4463692655, 363.6864005063), (-1.524, 363.2400312408))
            Line((-1.524, 363.2400312408), (0, 363.2400312408))
            Line((0, 363.2400312408), (0, 364.7640312408))
        make_face()
    extrude(amount=F10_S2_T9_DEPTH, mode=Mode.SUBTRACT)

    # F10_s2_s12 → F10_s2_t11 (cut)
    with BuildSketch(Plane.XZ.offset(1.524)):
        with BuildLine():
            ThreePointArc((367.7564988016, -66.2372525768), (367.2678975581, -67.2280378861), (366.2382980817, -67.6284272248))
            Line((366.2382980817, -67.6284272248), (367.6347867909, -67.6284272248))
            Line((367.6347867909, -67.6284272248), (367.7564988016, -66.2372525768))
        make_face()
    extrude(amount=F10_S2_T11_DEPTH, mode=Mode.SUBTRACT)


with BuildPart() as f10_s2_tool14:
    # F10_s2_s15 → F10_s2_t16 (new body)
    with BuildSketch(Plane.XZ.offset(11.176)):
        Polygon((366.2382980817, -66.1044272248), (367.7564988016, -66.2372525768), (367.6347867909, -67.6284272248), (366.2382980817, -67.6284272248), align=None)
    extrude(amount=F10_S2_T16_DEPTH)

    # F10_s2_s17 → F10_s2_t18 (revolve, cut)
    with BuildSketch(Plane(origin=(366.2382980817, -11.176, -66.1044272248), x_dir=(-0.6755902076, 0, 0.7372773368), z_dir=(0.7372773368, 0, 0.6755902076))):
        with BuildLine():
            ThreePointArc((0, -1.524), (1.524, 0), (0, 1.524))
            Line((0, 1.524), (0, -1.524))
        make_face()
    revolve(axis=Axis((366.2382980817, -11.176, -66.1044272248), (0, -1, 0)), mode=Mode.SUBTRACT)


with BuildPart() as f1_1:
    add(f1.part)

    # F10_s2_t13: cut F10_s2_tool14
    add(f10_s2_tool14.part, mode=Mode.SUBTRACT)


with BuildPart() as f10_s2_tool20:
    # F10_s2_s21 → F10_s2_t22 (new body)
    with BuildSketch(Plane.XZ.offset(1.524)):
        Polygon((366.2382980817, -66.1044272248), (367.7564988016, -66.2372525768), (367.6347867909, -67.6284272248), (366.2382980817, -67.6284272248), align=None)
    extrude(amount=-F10_S2_T22_DEPTH)

    # F10_s2_s23 → F10_s2_t24 (revolve, cut)
    with BuildSketch(Plane(origin=(366.2382980817, -1.524, -66.1044272248), x_dir=(-0.6755902076, 0, 0.7372773368), z_dir=(-0.7372773368, 0, -0.6755902076))):
        with BuildLine():
            ThreePointArc((0, -1.524), (1.524, 0), (0, 1.524))
            Line((0, 1.524), (0, -1.524))
        make_face()
    revolve(axis=Axis((366.2382980817, -1.524, -66.1044272248), (0, 1, 0)), mode=Mode.SUBTRACT)


with BuildPart() as f1_2:
    add(f1_1.part)

    # F10_s2_t19: cut F10_s2_tool20
    add(f10_s2_tool20.part, mode=Mode.SUBTRACT)

    # F10_s2_s25 → F10_s2_t26 (revolve, cut)
    with BuildSketch(Plane(origin=(365.6532950565, 0, -31.9905180983), x_dir=(0, 1, 0), z_dir=(0.9961946981, 0, -0.0871557427))):
        with BuildLine():
            ThreePointArc((-1.524, 6.4507696589), (-0.4463692655, 6.0044003935), (0, 4.9267696589))
            Line((0, 4.9267696589), (0, 6.4507696589))
            Line((0, 6.4507696589), (-1.524, 6.4507696589))
        make_face()
    revolve(axis=Axis((365.8834532975, 0, -29.3597973652), (0, -1, 0)), revolution_arc=F10_S2_T26_ANGLE, mode=Mode.SUBTRACT)

    # F10_s2_s27 → F10_s2_t28 (revolve, cut)
    with BuildSketch(Plane(origin=(0.2301582411, 0, 2.6307207331), x_dir=(0, 1, 0), z_dir=(-0.0871557427, 0, -0.9961946981))):
        with BuildLine():
            ThreePointArc((0, 370.6060312408), (-0.4463692655, 371.6836619753), (-1.524, 372.1300312408))
            Line((-1.524, 372.1300312408), (0, 372.1300312408))
            Line((0, 372.1300312408), (0, 370.6060312408))
        make_face()
    revolve(axis=Axis((367.1486205641, 0, -29.4704851585), (0, -1, 0)), revolution_arc=F10_S2_T28_ANGLE, mode=Mode.SUBTRACT)


with BuildPart() as f10_s2_tool31:
    # F10_s2_s32 → F10_s2_t33 (new body)
    with BuildSketch(Plane(origin=(365.6532950565, 0, -31.9905180983), x_dir=(0, 1, 0), z_dir=(-0.9961946981, 0, 0.0871557427))):
        with BuildLine():
            ThreePointArc((0, 14.1232303411), (-0.4463692655, 13.0455996065), (-1.524, 12.5992303411))
            Line((-1.524, 12.5992303411), (0, 12.5992303411))
            Line((0, 12.5992303411), (0, 14.1232303411))
        make_face()
    extrude(amount=F10_S2_T33_DEPTH)

    split(bisect_by=Plane(origin=(361.8577932568, 0, -31.6584547185), x_dir=(0, 1, 0), z_dir=(0.9961946981, 0, -0.0871557427)), keep=Keep.TOP)


with BuildPart() as f10_s2_tool35:
    # F10_s2_s36 → F10_s2_t37 (new body)
    with BuildSketch(Plane(origin=(0.2301582411, 0, 2.6307207331), x_dir=(0, 1, 0), z_dir=(-0.0871557427, 0, -0.9961946981))):
        with BuildLine():
            ThreePointArc((0, 364.7640312408), (-0.4463692655, 363.6864005063), (-1.524, 363.2400312408))
            Line((-1.524, 363.2400312408), (0, 363.2400312408))
            Line((0, 363.2400312408), (0, 364.7640312408))
        make_face()
    extrude(amount=F10_S2_T37_DEPTH)

    split(bisect_by=Plane(origin=(-1.0980952784, 0, -12.5512864658), x_dir=(0, 1, 0), z_dir=(-0.0871557427, 0, -0.9961946981)), keep=Keep.TOP)


with BuildPart() as f10_s2_tool31_1:
    add(f10_s2_tool31.part)

    # F10_s2_t39: intersect F10_s2_tool35
    add(f10_s2_tool35.part, mode=Mode.INTERSECT)


with BuildPart() as f1_3:
    add(f1_2.part)

    # F10_s2_t29: cut F10_s2_tool31
    add(f10_s2_tool31_1.part, mode=Mode.SUBTRACT)


solid = f1_3.part
